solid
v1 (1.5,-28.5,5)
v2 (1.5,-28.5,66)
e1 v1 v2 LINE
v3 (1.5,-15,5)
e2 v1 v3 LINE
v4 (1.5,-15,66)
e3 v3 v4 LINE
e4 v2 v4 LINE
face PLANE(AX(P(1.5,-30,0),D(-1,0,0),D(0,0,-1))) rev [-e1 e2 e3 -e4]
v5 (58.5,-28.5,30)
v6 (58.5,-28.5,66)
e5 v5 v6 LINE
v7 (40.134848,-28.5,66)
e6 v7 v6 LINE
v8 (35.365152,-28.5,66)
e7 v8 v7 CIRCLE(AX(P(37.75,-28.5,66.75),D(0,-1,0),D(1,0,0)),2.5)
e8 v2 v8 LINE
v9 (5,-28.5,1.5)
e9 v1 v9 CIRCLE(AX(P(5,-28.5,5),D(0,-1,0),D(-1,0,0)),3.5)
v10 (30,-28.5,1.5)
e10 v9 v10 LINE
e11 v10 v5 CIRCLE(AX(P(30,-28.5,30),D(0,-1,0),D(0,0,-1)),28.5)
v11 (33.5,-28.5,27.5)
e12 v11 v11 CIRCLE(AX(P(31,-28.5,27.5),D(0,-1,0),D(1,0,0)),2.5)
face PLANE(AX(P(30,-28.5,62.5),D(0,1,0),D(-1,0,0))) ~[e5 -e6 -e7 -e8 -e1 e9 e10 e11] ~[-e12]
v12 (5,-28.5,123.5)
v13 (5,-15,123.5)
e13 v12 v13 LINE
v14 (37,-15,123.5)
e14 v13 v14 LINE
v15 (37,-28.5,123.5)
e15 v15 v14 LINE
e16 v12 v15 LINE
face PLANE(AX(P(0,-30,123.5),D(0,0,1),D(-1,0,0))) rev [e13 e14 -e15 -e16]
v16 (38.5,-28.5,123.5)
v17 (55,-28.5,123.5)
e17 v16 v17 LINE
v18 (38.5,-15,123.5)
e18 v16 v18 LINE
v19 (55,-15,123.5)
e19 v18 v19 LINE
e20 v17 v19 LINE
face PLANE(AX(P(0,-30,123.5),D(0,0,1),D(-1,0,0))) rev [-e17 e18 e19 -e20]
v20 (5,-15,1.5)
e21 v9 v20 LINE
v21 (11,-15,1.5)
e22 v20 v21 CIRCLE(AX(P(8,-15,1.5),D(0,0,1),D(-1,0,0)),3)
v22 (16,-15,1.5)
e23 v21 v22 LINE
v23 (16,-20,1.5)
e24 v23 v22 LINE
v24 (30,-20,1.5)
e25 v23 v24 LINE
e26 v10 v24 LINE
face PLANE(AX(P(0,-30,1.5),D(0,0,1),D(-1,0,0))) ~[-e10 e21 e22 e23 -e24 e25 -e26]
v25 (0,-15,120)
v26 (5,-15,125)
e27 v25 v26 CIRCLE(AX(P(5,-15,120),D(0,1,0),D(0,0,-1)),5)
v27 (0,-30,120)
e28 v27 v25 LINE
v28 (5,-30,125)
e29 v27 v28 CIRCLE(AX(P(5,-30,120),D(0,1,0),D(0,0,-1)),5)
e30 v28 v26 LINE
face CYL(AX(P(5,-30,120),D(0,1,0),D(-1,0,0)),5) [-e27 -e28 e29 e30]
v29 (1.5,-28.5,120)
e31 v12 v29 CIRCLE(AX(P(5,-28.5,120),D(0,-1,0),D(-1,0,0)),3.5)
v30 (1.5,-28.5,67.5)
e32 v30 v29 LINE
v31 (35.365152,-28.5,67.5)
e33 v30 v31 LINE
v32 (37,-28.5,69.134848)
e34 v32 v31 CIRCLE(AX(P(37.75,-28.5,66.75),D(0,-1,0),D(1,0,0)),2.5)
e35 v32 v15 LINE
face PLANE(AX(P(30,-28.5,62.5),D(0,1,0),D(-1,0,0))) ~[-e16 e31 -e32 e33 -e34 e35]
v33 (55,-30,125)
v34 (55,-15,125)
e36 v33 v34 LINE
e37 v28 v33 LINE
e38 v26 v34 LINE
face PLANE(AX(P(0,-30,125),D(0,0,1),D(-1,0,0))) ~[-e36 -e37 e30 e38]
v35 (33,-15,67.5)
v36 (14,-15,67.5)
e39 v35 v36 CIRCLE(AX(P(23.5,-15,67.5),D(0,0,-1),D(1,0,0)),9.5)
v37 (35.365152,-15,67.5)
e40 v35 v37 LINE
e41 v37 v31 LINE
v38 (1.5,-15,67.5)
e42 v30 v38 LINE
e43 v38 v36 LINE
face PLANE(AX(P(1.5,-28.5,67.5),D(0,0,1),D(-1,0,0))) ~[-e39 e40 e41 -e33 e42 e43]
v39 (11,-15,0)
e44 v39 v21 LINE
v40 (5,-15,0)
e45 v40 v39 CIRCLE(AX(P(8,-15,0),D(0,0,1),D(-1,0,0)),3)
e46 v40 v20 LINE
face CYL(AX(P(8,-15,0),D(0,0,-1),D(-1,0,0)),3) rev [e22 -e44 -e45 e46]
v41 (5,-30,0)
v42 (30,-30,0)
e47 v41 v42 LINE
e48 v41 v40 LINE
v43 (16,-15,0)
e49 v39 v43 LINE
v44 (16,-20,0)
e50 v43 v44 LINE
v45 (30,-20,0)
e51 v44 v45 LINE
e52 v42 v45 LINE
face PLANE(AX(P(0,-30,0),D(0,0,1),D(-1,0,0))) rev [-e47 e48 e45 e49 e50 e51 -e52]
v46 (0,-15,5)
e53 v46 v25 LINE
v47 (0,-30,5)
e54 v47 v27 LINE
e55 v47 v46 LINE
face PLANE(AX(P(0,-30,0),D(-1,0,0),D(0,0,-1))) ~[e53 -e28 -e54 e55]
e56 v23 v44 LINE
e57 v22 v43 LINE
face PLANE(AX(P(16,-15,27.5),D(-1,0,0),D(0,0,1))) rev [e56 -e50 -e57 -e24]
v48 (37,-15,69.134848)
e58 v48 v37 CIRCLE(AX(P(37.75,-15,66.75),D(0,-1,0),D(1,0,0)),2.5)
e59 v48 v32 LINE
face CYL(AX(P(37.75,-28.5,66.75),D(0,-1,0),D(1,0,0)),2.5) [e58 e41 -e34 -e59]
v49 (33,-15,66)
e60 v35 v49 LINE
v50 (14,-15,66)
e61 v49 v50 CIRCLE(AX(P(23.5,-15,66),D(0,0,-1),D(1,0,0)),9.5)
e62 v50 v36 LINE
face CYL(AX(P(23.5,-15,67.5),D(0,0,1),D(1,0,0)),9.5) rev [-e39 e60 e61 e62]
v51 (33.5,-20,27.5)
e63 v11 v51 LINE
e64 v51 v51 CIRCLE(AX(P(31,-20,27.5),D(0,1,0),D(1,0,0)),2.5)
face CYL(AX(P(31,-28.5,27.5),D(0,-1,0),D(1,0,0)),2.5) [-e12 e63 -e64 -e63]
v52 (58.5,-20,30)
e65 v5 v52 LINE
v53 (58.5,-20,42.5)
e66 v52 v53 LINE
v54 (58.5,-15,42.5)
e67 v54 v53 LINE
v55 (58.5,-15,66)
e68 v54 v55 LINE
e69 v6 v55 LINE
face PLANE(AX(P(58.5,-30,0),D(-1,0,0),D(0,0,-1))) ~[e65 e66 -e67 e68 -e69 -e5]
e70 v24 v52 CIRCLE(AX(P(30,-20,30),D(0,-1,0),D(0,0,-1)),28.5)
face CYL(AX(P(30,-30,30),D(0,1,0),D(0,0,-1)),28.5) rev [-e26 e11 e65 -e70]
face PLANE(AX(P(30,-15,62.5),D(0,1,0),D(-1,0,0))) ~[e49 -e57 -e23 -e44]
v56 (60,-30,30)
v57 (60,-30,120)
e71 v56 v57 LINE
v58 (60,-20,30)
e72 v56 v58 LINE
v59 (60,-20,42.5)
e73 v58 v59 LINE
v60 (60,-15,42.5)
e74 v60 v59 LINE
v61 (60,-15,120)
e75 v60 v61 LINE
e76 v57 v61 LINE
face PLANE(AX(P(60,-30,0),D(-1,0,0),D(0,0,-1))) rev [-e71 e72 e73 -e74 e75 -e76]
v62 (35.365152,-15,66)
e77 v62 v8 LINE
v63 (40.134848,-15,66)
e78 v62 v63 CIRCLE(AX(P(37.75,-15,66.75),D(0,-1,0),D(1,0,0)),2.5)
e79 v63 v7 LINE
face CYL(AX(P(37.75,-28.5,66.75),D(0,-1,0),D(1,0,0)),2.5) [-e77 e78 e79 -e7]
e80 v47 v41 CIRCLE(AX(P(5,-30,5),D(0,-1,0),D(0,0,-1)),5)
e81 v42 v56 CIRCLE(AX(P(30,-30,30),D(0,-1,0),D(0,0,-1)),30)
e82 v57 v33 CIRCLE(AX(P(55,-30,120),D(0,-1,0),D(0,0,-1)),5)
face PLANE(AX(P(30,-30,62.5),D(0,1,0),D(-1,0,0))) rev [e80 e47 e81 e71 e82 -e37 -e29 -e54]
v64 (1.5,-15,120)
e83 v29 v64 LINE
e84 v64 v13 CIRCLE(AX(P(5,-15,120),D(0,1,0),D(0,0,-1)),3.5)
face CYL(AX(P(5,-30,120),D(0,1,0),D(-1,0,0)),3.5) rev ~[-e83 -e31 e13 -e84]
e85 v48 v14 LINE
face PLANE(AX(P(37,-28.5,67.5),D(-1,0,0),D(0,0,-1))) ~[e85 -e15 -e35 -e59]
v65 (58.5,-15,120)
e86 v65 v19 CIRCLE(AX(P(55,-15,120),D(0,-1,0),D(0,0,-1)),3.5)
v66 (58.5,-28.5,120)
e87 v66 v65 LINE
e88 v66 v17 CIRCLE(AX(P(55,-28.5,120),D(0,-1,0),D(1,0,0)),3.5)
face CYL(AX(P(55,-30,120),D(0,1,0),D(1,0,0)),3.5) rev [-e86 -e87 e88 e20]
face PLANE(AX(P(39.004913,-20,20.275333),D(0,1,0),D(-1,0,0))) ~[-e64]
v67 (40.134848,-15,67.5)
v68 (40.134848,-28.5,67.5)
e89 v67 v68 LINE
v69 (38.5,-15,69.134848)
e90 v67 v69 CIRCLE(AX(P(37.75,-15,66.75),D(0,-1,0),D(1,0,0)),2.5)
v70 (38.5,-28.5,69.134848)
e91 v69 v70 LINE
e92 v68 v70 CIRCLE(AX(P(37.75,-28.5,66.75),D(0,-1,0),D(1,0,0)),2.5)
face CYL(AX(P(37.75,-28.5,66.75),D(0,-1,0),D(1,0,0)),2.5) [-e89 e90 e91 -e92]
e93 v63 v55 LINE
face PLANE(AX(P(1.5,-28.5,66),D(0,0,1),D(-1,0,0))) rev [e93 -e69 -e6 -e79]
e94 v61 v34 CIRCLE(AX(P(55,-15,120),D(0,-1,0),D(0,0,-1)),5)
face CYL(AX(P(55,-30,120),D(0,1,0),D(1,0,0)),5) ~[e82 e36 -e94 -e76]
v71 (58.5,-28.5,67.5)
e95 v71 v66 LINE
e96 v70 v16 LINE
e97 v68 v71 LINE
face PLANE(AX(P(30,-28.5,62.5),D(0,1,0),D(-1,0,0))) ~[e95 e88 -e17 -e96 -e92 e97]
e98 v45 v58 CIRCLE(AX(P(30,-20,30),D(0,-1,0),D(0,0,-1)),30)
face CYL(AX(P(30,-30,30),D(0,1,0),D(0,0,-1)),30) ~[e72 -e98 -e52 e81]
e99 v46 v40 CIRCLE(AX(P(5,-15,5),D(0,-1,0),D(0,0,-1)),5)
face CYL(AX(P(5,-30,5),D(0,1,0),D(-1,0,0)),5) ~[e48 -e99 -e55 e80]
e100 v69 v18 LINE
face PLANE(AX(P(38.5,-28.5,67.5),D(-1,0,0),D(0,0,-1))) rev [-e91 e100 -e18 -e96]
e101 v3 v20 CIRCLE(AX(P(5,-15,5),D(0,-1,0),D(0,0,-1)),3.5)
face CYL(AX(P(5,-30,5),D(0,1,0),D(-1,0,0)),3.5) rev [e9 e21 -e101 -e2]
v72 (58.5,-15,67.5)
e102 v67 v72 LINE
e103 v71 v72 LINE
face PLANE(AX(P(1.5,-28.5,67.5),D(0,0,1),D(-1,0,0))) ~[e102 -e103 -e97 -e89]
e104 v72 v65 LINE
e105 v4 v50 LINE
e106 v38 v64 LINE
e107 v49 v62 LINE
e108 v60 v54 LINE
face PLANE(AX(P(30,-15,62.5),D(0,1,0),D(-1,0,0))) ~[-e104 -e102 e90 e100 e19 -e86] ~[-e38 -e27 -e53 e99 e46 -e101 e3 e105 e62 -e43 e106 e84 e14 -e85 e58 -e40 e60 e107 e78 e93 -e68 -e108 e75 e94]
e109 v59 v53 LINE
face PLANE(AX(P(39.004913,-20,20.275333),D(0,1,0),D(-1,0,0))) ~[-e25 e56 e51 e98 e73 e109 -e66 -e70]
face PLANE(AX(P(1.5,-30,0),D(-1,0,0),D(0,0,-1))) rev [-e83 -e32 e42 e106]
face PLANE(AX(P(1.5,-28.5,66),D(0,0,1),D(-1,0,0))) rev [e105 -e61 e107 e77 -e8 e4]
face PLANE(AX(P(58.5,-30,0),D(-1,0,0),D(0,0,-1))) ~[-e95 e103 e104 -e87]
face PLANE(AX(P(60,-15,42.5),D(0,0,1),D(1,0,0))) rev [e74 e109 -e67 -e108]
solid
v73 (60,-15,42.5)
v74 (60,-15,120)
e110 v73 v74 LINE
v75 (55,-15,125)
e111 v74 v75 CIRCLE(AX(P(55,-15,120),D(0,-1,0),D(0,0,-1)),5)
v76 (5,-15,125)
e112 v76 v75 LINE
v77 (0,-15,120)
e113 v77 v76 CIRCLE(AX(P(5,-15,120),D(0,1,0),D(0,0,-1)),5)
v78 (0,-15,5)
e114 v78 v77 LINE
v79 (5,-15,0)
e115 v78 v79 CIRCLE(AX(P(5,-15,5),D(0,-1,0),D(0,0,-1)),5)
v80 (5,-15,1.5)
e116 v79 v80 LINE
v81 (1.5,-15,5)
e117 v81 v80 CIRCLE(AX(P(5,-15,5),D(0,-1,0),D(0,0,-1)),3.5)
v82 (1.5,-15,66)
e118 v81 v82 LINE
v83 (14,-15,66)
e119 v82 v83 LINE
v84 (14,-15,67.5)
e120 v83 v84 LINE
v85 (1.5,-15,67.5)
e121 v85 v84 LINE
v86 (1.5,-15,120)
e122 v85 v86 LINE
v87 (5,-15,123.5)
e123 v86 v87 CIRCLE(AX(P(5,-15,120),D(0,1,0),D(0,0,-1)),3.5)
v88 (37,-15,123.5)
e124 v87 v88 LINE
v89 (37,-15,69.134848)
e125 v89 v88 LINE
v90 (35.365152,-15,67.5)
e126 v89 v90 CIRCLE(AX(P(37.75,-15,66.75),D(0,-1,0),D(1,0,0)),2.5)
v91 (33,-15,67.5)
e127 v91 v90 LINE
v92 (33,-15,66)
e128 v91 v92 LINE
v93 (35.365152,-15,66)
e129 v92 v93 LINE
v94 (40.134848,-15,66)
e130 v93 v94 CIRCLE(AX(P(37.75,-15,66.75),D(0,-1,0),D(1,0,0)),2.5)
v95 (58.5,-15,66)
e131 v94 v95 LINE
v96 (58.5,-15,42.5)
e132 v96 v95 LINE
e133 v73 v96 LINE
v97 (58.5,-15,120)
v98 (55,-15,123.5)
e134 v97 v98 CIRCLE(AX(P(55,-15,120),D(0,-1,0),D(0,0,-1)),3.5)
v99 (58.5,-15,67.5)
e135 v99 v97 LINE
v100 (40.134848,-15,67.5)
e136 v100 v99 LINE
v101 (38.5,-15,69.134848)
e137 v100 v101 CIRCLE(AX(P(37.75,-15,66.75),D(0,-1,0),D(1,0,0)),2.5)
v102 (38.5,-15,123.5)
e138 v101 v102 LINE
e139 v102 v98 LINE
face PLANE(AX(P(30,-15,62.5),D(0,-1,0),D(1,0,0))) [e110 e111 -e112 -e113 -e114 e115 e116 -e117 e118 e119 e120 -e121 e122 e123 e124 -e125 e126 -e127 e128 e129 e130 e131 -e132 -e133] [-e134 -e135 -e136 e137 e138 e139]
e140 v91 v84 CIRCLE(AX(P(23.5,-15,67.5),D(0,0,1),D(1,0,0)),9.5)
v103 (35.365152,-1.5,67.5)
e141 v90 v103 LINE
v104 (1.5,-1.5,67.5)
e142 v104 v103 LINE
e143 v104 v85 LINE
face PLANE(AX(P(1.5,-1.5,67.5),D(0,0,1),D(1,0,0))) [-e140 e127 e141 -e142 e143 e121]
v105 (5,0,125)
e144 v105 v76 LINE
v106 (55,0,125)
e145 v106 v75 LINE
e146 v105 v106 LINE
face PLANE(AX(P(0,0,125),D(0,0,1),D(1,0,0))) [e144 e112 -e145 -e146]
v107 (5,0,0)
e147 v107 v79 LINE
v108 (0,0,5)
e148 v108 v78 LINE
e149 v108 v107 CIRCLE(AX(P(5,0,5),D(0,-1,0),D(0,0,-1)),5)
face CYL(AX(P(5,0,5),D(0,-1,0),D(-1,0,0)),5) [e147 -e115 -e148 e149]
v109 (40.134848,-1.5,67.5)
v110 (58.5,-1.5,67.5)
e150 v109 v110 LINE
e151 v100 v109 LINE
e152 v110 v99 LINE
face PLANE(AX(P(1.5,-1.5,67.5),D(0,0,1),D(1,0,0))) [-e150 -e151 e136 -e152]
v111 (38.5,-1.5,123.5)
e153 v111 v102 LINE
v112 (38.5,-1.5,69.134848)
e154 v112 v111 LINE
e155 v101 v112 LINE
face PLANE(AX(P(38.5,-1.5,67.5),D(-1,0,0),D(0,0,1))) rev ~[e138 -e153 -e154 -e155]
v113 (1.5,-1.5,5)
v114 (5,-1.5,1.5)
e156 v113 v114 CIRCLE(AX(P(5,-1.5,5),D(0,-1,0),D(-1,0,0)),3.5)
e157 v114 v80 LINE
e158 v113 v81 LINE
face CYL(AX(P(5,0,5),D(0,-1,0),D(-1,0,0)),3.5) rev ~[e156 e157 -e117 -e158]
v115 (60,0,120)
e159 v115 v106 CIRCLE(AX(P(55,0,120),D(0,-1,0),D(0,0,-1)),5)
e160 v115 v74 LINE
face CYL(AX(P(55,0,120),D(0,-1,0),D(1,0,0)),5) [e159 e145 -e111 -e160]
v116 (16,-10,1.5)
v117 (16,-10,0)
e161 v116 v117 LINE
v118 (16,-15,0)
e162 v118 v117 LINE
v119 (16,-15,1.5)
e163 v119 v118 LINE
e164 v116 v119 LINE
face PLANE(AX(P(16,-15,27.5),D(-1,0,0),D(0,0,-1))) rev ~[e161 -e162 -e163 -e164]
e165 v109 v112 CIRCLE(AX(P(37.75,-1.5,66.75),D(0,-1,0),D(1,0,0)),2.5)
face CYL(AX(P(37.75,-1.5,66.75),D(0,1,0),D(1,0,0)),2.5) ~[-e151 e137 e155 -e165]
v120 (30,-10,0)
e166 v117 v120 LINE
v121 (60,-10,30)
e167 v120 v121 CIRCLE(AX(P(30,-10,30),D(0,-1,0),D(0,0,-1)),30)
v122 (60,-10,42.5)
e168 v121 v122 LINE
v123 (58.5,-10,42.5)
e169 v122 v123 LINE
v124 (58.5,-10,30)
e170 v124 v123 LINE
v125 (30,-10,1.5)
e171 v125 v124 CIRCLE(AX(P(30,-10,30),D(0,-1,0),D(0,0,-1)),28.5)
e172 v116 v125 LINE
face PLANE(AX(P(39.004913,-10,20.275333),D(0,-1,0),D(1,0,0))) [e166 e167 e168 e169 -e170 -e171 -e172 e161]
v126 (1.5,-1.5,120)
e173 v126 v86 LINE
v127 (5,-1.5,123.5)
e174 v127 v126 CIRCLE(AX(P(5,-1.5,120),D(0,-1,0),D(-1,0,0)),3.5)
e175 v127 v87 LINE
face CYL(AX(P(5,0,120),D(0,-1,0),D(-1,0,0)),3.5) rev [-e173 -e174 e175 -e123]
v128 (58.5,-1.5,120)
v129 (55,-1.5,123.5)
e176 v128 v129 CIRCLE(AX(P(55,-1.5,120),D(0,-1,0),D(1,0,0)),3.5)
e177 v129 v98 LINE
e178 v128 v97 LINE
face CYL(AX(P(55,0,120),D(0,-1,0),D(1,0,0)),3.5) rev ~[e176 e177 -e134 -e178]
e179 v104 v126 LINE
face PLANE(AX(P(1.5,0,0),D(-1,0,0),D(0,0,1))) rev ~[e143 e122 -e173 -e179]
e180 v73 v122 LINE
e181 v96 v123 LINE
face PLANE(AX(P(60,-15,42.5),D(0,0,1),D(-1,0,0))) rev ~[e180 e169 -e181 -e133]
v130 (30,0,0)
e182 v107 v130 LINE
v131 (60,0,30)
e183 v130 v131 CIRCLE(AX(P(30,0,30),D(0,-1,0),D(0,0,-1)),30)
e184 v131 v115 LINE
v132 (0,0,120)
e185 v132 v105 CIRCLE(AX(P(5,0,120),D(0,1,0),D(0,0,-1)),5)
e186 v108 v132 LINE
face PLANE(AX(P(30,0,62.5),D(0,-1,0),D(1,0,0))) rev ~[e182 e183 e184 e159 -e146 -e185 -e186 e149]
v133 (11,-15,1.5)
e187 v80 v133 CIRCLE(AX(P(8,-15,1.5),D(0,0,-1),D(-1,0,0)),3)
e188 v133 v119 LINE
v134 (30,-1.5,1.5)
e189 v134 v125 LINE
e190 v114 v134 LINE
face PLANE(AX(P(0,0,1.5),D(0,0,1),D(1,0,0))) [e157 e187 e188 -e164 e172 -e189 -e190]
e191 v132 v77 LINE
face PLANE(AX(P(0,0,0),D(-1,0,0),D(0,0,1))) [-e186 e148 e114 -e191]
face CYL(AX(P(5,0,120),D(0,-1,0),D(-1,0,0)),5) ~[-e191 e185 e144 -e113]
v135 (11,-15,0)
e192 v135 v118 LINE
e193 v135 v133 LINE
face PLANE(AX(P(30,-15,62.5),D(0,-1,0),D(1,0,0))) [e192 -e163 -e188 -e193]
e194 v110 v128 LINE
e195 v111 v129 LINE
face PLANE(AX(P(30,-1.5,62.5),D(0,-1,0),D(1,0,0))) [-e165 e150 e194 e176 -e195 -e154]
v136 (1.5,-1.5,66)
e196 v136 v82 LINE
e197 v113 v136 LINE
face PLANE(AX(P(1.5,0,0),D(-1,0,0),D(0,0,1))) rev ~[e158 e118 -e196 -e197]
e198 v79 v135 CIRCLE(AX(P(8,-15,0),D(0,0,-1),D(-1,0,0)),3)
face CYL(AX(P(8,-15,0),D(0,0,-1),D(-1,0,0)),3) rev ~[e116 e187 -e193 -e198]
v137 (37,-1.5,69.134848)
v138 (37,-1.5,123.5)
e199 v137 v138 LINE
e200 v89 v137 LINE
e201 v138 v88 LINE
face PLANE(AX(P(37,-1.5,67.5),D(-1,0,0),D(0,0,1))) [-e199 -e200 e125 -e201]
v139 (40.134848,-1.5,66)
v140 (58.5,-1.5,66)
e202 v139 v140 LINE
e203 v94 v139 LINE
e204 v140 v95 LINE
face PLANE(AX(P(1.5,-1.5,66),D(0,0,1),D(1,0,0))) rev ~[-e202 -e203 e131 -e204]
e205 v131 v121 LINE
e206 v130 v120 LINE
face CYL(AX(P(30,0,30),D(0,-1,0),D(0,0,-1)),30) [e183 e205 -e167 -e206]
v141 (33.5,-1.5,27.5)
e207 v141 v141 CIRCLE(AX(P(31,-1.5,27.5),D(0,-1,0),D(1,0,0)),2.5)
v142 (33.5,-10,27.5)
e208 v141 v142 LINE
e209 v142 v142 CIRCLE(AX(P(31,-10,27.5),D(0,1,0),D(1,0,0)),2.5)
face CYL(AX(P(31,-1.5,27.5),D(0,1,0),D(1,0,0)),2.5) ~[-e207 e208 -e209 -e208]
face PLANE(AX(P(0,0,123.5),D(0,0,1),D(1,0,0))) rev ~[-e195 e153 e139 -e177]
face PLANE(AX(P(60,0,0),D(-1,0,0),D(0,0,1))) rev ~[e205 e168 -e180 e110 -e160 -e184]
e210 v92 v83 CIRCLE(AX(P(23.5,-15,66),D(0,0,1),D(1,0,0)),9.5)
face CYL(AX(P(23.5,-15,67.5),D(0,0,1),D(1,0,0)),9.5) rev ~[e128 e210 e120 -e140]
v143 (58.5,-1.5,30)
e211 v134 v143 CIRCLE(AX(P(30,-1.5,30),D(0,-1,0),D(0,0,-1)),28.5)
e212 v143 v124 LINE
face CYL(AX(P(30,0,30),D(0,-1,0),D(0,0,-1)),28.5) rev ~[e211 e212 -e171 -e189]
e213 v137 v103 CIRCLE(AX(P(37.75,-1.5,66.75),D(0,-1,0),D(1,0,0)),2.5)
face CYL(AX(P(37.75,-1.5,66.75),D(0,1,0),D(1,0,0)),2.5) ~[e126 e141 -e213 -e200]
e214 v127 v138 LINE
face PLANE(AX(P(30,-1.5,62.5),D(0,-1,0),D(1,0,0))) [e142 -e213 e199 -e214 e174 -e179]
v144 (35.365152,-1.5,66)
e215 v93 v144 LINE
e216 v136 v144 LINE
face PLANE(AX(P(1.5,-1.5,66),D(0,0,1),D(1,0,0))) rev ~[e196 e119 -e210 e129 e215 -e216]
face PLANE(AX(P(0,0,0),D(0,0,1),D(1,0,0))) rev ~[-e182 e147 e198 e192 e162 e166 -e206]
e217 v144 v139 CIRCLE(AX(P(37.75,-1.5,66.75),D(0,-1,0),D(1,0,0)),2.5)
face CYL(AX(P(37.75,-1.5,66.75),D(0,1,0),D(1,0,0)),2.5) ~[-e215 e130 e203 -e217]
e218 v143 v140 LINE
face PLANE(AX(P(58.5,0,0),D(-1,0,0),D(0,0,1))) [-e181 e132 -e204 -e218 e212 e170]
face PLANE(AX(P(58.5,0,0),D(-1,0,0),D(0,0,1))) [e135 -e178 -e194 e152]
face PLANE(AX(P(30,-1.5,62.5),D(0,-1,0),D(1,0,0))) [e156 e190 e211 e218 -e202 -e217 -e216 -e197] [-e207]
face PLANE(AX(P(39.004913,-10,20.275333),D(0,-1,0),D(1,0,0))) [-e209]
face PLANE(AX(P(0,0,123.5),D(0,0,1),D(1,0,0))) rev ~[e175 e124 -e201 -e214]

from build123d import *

# Parameters (mm, degrees)
F0_W      = 60
F0_H      = 125
F1_DEPTH  = 15
F2_R      = 5
F3_R      = 30
F4_T      = -1.5
F5_W      = 57
F5_H      = 1.5
F6_DEPTH  = 13.5
F7_R      = 9.5
F8_DEPTH  = 1.5
F9_W      = 1.5
F9_H      = 56
F10_DEPTH = 13.5
F11_R     = 2.5
F12_DEPTH = 13.5
F14_DEPTH = 1.5
F15_R     = 2.5
F16_DEPTH = 13.5
F18_DEPTH = 5


# Not quite as in the source:
# - a feature of the source that left no trace in its solid (it failed there, or was rolled back) is left out


with BuildPart() as f1:
    # F0 (on Front) → F1 (new body)
    with BuildSketch(Plane.XZ):
        with Locations((30, 62.5)):
            Rectangle(F0_W, F0_H)
    extrude(amount=F1_DEPTH)

    # F2
    f2_edges = [f1.edges().sort_by_distance(p)[0] for p in [
        (0, -7.5, 125),
        (60, -7.5, 125),
        (0, -7.5, 0),
    ]]
    fillet(f2_edges, radius=F2_R)

    # F3
    f3_edges = [f1.edges().sort_by_distance(p)[0] for p in [
        (60, -7.5, 0),
    ]]
    fillet(f3_edges, radius=F3_R)

    # F4
    f4_openings = [f1.faces().sort_by_distance(p)[0] for p in [
        (29.404035, -15, 63.933016),
    ]]
    offset(amount=F4_T, openings=f4_openings)

    # F5 (on face) → F6 (join, through all)
    with BuildSketch(Plane.XZ.offset(1.5)):
        with Locations((30, 66.75)):
            Rectangle(F5_W, F5_H)
    extrude(amount=F6_DEPTH)

    # F7 (on face) → F8 (cut, through all)
    with BuildSketch(Plane.XY.offset(67.5)):
        with Locations((23.5, -15)):
            Circle(F7_R)
    extrude(amount=-F8_DEPTH, mode=Mode.SUBTRACT)

    # F9 (on face) → F10 (join, through all)
    with BuildSketch(Plane.XZ.offset(1.5)):
        with Locations((37.75, 95.5)):
            Rectangle(F9_W, F9_H)
    extrude(amount=F10_DEPTH)

    # F11 (on face) → F12 (join, through all)
    with BuildSketch(Plane.XZ.offset(1.5)):
        with Locations((37.75, 66.75)):
            Circle(F11_R)
    extrude(amount=F12_DEPTH)

    # F13 (on face) → F14 (cut, through all)
    with BuildSketch(Plane(origin=(0, 0, 0), x_dir=(1, 0, 0), z_dir=(0, 0, -1))):
        with BuildLine():
            ThreePointArc((5, 15), (8, 12), (11, 15))
            Line((11, 15), (5, 15))
        make_face()
    extrude(amount=-F14_DEPTH, mode=Mode.SUBTRACT)

    # F15 (on face) → F16 (join, through all)
    with BuildSketch(Plane.XZ.offset(1.5)):
        with Locations((31, 27.5)):
            Circle(F15_R)
    extrude(amount=F16_DEPTH)

    # F17 (on face) → F18 (cut)
    with BuildSketch(Plane.XZ.offset(15)):
        with BuildLine():
            Line((60, 42.5), (31, 42.5))
            ThreePointArc((31, 42.5), (20.3933982822, 38.1066017178), (16, 27.5))
            Line((16, 27.5), (16, 0))
            Line((16, 0), (60, 0))
            Line((60, 0), (60, 42.5))
        make_face()
    extrude(amount=-F18_DEPTH, mode=Mode.SUBTRACT)


with BuildPart() as f19_1:
    # F19: instance of F1
    add(f1.part.mirror(Plane(origin=(28.1417704528, -15, 81.7211292347), x_dir=(1, 0, 0), z_dir=(0, -1, 0))))


solid = Compound([f1.part, f19_1.part])
